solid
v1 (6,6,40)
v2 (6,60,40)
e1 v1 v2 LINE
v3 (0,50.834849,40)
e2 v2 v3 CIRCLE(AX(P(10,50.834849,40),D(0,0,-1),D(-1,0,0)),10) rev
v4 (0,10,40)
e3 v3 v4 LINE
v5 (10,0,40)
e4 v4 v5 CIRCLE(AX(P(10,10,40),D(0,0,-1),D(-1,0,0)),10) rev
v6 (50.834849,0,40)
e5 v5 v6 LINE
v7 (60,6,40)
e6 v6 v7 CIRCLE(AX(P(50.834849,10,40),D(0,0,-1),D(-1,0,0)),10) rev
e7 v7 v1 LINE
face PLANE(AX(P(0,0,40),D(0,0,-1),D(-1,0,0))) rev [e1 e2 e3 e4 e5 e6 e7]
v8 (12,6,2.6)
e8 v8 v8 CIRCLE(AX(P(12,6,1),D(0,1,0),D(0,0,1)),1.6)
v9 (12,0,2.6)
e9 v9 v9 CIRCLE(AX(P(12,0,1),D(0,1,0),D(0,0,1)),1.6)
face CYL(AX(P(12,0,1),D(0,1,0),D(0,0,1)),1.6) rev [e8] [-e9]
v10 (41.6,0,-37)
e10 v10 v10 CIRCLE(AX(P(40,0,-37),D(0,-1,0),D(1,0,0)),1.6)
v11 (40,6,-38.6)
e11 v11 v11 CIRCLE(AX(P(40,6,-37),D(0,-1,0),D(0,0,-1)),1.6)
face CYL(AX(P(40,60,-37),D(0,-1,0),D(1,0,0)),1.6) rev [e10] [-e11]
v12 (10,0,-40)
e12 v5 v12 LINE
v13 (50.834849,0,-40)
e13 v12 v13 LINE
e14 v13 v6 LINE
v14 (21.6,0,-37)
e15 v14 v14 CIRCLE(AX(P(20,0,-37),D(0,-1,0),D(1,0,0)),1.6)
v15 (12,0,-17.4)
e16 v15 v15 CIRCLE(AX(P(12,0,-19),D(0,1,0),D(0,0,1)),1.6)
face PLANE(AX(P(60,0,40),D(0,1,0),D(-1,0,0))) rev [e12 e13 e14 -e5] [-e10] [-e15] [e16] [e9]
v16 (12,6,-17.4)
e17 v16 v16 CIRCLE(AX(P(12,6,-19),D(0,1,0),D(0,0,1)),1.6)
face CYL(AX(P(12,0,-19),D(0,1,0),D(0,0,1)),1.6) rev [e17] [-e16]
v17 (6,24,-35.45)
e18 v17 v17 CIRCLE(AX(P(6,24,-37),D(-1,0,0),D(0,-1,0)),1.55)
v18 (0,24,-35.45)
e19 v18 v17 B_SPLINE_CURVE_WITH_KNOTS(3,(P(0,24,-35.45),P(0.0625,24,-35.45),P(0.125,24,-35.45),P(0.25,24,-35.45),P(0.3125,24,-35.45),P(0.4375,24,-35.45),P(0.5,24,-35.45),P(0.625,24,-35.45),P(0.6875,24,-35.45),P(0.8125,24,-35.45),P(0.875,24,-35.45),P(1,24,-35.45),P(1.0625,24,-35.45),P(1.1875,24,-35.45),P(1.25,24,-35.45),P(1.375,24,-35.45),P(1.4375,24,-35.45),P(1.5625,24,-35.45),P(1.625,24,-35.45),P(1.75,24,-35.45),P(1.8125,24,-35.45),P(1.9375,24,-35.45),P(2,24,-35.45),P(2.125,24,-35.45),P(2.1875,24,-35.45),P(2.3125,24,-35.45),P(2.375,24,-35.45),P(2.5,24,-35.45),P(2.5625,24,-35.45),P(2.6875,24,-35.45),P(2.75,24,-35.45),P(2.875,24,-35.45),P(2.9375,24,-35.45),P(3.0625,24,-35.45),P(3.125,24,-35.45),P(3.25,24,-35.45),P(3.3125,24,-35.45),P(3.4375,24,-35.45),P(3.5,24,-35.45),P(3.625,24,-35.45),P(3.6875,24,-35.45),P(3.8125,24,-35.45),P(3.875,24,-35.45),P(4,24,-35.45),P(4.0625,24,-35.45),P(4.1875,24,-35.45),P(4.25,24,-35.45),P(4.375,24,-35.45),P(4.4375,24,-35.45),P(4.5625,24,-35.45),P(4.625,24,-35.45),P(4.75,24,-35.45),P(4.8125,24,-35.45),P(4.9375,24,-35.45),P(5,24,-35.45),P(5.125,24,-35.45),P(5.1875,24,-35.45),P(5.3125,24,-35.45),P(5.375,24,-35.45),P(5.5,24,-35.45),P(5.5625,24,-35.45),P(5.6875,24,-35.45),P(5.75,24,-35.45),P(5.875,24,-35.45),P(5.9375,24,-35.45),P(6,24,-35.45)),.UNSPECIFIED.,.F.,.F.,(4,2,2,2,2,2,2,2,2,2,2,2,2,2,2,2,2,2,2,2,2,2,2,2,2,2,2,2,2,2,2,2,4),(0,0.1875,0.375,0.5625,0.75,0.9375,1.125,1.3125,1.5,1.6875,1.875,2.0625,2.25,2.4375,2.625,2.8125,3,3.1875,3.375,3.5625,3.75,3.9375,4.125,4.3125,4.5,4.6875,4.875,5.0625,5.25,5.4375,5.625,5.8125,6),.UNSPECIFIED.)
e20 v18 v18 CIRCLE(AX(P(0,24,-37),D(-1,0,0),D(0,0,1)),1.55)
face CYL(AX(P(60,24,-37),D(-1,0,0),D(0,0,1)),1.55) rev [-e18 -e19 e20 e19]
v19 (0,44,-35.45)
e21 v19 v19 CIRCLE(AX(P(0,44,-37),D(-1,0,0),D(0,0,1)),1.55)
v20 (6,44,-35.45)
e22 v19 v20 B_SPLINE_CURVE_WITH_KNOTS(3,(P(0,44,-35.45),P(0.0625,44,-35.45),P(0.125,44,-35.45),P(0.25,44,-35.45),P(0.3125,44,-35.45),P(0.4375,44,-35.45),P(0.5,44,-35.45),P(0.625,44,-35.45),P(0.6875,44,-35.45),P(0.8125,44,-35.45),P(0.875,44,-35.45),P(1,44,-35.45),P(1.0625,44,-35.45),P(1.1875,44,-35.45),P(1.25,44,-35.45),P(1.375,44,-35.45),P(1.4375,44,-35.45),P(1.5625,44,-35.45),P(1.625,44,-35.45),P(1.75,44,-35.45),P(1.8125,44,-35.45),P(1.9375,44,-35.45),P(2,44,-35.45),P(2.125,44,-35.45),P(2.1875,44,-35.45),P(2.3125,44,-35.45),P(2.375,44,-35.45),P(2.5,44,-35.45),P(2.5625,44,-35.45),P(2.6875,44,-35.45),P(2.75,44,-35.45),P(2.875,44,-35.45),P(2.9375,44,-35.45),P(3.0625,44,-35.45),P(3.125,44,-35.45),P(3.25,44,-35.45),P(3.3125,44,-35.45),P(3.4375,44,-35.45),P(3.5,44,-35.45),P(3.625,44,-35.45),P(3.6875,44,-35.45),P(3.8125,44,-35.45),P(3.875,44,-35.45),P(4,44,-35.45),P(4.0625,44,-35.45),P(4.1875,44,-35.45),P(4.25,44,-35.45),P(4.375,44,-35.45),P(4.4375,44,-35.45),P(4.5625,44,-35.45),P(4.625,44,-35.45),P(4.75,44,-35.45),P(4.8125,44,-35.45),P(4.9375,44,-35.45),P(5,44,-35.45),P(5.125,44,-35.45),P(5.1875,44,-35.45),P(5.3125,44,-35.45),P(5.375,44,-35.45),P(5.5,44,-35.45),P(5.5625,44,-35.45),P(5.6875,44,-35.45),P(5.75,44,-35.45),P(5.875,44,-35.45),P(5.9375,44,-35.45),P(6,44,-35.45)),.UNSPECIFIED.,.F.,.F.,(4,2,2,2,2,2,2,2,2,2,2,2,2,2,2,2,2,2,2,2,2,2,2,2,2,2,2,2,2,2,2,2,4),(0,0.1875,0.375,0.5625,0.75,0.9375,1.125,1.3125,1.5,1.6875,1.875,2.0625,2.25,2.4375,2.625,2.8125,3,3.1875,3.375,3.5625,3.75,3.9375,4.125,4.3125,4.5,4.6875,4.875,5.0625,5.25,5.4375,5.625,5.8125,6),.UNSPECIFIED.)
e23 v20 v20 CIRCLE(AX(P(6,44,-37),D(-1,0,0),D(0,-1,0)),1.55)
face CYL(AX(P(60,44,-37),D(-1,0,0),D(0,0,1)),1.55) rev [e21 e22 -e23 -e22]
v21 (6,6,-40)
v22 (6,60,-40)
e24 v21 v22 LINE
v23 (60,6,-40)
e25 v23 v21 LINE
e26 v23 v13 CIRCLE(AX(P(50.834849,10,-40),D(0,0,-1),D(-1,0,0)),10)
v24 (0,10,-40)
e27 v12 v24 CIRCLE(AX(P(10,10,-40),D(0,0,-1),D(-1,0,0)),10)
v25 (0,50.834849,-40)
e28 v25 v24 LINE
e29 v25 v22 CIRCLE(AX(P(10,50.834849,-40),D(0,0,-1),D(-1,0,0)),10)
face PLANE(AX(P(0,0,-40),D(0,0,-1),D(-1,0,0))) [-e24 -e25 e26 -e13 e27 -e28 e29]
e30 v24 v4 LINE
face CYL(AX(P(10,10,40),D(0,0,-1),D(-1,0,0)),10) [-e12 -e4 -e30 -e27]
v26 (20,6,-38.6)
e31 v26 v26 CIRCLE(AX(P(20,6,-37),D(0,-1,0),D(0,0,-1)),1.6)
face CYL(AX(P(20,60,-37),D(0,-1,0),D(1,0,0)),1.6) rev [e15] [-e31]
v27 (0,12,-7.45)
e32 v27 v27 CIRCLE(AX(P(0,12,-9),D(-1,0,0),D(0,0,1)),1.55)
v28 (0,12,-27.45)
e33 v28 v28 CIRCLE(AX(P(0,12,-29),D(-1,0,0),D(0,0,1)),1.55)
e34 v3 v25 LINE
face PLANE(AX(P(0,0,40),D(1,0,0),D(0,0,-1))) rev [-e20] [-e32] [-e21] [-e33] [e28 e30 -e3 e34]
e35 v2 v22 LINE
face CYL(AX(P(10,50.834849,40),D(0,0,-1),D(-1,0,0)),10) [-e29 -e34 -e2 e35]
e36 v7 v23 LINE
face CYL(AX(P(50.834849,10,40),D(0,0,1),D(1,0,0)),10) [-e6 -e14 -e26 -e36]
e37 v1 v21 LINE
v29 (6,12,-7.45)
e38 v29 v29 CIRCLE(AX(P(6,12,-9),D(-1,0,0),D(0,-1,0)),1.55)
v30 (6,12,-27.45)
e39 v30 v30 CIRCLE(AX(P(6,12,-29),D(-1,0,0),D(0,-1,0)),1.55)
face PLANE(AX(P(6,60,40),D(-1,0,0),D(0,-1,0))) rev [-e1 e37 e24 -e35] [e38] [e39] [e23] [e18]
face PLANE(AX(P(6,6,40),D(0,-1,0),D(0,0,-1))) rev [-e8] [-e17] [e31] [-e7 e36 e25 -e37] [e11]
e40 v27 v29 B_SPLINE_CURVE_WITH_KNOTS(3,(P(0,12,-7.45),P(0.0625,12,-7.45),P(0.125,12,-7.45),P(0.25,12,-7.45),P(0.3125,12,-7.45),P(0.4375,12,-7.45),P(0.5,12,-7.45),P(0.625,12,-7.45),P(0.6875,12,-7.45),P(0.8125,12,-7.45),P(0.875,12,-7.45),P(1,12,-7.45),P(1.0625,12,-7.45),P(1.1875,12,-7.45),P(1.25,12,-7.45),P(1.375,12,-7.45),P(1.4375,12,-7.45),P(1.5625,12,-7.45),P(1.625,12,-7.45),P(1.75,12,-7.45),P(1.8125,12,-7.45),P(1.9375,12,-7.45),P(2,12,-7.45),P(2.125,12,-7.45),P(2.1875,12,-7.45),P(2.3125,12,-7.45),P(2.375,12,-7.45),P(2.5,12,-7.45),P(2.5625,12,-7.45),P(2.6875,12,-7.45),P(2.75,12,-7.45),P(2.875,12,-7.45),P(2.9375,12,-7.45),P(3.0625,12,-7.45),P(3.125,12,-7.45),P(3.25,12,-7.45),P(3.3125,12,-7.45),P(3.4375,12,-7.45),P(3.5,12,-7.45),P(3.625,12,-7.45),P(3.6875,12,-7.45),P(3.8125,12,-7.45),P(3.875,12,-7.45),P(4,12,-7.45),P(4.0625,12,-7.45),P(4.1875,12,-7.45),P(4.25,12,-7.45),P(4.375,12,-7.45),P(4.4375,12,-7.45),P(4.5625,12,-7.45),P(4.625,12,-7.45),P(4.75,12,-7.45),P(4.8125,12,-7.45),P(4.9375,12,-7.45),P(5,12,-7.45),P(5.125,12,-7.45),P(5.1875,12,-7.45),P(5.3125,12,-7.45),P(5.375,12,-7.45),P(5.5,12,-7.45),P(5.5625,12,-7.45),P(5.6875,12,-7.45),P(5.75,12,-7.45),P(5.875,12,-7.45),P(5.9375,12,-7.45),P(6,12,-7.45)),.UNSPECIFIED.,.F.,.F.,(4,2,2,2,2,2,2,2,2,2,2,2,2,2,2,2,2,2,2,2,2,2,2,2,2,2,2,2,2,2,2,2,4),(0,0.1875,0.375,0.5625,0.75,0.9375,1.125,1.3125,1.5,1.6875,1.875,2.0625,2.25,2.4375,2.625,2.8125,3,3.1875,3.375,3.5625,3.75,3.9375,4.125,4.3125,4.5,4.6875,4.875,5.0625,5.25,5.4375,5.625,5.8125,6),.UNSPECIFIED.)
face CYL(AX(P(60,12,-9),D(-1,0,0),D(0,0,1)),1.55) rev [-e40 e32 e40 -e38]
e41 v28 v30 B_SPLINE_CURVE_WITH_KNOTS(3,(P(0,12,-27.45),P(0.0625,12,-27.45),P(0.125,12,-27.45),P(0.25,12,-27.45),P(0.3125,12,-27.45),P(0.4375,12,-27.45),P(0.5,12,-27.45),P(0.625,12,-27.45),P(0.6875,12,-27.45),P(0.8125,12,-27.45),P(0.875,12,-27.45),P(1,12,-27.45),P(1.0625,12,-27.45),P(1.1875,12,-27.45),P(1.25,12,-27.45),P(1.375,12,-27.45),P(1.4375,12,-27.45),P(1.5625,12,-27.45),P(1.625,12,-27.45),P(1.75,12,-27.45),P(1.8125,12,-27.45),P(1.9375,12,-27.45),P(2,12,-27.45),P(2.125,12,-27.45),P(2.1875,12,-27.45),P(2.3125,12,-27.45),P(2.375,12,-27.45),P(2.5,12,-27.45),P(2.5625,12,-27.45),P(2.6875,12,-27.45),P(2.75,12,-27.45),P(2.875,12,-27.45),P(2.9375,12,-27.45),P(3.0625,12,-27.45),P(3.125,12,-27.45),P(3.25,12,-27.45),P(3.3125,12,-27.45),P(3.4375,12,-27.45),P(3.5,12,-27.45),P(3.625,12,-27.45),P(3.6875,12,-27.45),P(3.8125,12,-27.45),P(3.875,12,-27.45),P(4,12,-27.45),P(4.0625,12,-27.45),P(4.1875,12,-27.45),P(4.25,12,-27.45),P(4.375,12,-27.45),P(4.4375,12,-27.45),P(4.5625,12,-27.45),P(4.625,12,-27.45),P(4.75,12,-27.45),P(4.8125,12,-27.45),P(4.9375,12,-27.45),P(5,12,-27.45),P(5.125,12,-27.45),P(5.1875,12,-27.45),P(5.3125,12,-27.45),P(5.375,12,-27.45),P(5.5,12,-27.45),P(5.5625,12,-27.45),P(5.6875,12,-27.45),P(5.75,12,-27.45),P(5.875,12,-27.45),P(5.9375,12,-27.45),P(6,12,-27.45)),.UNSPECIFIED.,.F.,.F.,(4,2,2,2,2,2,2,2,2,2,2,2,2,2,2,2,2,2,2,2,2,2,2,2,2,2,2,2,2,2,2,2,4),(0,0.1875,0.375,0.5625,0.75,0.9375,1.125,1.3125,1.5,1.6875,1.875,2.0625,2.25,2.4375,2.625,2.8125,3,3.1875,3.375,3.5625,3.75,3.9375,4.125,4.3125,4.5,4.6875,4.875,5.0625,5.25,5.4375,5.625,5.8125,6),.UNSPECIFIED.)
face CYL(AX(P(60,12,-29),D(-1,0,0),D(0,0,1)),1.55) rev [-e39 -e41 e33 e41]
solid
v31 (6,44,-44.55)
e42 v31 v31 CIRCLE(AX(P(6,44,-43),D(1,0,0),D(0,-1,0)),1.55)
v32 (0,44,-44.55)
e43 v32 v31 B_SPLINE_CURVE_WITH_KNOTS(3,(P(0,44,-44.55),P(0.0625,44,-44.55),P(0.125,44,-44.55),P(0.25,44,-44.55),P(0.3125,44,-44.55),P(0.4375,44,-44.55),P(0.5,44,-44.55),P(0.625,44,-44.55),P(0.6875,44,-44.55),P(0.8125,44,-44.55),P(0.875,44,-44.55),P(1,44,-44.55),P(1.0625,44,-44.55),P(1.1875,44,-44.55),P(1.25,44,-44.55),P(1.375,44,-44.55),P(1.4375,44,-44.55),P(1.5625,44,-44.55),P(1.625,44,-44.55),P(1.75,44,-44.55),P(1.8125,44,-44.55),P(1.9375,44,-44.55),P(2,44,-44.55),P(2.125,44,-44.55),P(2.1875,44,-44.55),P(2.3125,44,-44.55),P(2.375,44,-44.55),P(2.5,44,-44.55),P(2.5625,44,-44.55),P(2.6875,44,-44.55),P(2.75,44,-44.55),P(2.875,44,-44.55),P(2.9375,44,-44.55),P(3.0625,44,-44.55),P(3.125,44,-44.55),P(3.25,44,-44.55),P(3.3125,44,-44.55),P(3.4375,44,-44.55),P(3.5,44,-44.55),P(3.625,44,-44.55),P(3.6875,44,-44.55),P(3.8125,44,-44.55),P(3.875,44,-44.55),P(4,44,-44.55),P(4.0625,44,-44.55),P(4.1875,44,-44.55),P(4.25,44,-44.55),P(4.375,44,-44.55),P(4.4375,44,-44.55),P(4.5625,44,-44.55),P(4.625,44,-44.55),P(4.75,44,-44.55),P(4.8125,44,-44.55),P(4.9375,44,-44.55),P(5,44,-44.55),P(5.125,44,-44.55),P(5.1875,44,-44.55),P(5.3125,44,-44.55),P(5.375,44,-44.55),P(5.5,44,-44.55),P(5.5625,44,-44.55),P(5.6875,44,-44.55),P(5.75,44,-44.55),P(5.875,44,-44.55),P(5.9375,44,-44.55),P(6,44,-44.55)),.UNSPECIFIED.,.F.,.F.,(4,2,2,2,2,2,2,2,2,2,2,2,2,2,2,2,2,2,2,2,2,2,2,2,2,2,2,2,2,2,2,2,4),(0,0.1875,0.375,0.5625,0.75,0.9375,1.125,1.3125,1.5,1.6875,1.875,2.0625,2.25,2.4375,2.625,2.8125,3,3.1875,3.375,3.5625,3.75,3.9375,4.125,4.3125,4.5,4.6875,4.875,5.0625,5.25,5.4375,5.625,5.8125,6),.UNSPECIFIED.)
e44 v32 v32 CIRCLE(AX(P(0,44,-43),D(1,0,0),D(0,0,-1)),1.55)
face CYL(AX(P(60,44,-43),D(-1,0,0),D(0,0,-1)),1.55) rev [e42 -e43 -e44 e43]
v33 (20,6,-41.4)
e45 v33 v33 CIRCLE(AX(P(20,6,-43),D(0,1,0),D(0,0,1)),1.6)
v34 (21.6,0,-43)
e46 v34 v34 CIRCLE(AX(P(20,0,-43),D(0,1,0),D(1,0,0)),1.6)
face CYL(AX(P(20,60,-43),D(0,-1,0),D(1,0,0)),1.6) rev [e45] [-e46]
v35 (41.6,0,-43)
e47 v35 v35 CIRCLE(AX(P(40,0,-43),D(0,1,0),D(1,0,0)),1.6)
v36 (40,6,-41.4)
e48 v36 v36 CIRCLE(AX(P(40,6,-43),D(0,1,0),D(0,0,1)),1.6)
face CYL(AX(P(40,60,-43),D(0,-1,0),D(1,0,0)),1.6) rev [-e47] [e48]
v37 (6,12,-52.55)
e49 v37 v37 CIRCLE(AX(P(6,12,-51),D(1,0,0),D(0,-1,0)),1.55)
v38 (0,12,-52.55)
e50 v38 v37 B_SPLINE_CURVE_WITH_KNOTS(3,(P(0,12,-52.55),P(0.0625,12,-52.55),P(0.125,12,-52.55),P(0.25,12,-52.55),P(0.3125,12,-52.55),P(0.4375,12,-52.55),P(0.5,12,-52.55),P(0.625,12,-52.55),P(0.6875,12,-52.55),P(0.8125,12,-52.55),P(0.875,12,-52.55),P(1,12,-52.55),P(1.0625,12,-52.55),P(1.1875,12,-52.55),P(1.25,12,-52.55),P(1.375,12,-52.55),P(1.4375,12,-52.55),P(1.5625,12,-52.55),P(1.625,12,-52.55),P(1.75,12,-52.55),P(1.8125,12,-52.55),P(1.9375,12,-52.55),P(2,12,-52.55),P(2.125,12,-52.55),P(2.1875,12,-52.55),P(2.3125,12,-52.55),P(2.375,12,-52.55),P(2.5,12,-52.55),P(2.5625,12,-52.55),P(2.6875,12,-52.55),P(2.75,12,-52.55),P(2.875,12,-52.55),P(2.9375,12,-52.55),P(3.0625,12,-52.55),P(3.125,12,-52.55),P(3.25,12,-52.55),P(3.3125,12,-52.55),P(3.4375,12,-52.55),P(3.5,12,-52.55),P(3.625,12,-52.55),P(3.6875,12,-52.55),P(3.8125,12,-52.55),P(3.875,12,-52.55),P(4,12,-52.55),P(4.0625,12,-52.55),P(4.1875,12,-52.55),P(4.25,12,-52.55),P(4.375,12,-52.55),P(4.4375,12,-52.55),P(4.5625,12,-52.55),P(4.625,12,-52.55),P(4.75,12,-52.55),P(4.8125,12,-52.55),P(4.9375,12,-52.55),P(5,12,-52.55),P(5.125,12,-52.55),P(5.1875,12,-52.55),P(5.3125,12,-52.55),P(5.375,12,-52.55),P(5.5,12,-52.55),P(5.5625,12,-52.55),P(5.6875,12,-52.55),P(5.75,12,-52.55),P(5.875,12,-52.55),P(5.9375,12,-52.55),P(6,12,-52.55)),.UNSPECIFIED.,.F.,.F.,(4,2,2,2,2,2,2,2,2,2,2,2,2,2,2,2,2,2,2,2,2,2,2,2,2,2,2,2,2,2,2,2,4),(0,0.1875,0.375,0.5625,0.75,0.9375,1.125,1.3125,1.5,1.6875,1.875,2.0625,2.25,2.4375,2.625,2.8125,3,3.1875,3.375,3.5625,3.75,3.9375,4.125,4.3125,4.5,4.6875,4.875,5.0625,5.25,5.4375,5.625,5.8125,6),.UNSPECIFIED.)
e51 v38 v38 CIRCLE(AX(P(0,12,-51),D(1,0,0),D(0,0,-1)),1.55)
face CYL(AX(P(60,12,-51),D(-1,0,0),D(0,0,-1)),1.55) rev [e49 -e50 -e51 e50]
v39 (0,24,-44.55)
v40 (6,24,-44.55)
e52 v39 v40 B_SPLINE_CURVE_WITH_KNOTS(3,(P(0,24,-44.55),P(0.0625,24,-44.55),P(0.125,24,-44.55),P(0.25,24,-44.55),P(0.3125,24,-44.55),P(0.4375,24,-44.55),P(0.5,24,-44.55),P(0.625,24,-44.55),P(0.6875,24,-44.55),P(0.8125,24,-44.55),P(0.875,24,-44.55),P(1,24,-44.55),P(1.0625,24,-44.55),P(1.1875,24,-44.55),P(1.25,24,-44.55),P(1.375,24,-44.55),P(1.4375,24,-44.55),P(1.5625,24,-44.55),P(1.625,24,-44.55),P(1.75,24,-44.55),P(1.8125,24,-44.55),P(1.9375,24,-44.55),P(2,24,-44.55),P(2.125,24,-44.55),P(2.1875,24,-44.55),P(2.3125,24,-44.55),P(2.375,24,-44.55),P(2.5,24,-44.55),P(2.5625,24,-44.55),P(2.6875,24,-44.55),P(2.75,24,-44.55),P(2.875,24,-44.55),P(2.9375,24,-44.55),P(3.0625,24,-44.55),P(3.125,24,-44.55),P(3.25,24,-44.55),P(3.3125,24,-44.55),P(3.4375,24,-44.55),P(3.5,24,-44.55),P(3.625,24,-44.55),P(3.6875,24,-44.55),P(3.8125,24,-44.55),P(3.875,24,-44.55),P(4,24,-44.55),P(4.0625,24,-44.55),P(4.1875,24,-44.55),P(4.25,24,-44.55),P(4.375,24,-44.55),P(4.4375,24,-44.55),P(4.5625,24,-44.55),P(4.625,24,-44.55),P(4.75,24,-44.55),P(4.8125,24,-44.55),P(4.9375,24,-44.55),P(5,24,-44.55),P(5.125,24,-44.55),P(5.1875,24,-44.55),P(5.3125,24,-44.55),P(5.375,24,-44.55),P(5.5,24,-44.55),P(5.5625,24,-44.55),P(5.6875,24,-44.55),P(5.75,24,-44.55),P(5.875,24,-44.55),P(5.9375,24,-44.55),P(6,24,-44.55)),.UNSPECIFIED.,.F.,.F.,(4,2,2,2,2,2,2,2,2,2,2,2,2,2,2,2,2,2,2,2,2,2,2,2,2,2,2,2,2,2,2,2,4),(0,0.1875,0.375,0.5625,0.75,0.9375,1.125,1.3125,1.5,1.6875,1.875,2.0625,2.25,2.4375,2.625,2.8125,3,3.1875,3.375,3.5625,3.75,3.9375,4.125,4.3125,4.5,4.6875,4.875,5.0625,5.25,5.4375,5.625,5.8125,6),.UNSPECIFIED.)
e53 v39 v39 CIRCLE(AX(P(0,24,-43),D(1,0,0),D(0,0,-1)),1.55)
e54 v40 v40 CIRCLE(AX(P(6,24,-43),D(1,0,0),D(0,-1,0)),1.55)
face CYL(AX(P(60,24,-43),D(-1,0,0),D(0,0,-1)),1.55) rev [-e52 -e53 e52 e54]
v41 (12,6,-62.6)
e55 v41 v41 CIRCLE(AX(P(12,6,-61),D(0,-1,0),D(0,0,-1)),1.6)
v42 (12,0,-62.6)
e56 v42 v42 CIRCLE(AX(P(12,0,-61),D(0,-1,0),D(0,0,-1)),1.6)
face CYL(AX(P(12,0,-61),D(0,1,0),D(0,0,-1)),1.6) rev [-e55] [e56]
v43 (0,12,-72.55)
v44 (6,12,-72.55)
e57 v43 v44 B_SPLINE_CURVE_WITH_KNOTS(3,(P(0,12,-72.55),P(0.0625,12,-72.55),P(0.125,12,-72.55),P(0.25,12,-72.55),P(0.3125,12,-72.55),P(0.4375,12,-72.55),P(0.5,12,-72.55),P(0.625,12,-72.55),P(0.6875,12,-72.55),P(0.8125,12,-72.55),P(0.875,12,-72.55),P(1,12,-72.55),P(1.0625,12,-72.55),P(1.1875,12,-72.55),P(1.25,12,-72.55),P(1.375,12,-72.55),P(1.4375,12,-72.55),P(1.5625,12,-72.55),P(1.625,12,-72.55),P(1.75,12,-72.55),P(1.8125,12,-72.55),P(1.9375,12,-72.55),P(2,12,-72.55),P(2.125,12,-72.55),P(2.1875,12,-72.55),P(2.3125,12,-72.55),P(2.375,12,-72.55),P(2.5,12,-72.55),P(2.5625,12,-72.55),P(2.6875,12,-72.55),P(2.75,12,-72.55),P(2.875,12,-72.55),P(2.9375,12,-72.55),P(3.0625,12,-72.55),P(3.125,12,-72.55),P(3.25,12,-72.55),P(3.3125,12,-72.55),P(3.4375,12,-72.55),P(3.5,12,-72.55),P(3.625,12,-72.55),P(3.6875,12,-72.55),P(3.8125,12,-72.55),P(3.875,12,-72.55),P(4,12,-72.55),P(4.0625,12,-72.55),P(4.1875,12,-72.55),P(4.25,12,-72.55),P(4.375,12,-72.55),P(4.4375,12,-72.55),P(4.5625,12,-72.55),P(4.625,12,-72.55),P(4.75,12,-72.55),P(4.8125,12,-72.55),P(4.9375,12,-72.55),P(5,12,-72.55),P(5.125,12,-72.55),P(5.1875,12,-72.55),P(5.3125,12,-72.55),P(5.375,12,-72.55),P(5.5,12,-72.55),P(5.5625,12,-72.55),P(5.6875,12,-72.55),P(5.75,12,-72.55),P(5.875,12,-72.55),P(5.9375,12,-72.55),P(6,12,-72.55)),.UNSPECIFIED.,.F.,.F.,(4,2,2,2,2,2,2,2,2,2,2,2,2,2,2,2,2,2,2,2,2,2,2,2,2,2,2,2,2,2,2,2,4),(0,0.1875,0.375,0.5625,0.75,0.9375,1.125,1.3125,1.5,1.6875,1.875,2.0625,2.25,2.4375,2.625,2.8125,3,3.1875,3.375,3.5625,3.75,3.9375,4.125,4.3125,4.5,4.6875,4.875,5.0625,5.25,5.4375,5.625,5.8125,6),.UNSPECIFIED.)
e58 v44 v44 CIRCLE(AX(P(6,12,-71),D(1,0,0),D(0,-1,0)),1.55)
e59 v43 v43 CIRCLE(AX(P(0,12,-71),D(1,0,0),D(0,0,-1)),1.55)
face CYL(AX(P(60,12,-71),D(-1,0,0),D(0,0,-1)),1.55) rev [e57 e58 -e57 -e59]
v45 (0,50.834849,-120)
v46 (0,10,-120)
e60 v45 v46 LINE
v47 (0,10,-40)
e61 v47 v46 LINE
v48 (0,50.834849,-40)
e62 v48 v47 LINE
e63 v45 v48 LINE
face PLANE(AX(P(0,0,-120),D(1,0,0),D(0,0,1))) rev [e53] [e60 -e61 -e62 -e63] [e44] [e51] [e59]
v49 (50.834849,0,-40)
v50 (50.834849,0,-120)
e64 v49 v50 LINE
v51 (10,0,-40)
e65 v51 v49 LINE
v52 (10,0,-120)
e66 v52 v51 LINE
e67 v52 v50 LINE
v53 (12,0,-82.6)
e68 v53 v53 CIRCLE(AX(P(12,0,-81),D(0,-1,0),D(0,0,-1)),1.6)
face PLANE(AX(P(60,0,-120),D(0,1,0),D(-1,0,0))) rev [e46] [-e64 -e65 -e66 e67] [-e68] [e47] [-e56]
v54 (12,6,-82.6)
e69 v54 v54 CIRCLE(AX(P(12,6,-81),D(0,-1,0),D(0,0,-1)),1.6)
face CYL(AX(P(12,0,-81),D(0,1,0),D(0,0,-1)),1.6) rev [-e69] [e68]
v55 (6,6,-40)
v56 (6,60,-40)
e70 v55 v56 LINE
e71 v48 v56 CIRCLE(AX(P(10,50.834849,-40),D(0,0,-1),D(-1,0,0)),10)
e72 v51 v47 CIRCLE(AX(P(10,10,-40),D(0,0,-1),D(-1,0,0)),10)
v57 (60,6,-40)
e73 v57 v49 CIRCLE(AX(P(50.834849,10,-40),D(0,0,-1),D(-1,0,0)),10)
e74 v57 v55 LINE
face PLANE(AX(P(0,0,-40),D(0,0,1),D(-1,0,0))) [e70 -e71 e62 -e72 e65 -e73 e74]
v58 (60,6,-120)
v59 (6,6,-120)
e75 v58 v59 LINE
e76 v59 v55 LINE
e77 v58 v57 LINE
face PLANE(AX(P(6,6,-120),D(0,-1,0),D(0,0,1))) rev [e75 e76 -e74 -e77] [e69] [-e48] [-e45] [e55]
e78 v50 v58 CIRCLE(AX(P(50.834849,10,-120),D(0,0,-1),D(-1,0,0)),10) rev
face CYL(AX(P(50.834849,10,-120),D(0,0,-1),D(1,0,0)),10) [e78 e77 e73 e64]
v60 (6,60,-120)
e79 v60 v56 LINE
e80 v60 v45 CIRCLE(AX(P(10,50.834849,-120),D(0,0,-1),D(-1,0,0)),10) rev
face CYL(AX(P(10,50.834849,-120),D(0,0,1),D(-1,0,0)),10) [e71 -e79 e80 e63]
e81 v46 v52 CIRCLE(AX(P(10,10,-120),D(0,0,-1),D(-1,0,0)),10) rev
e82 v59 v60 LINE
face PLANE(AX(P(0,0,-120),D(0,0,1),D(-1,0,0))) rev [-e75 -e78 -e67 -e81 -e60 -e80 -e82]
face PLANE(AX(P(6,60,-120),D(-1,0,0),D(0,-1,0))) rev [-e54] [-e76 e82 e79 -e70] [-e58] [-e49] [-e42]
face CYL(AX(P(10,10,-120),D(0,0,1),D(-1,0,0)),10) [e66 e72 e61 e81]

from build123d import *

# Parameters (mm, degrees)
EXTRUDE_1_DEPTH     = 40
FILLET_1_R          = 10
SKETCH_3_R          = 1.55
CUT_EXTRUDE_1_DEPTH = 94.808315196
SKETCH_4_R          = 1.6
CUT_EXTRUDE_2_DEPTH = 91.088845036
SKETCH_5_R          = 1.6
CUT_EXTRUDE_3_DEPTH = 94.808315196


with BuildPart() as part:
    # 草图1 → 凸台-拉伸1 (new, symmetric)
    with BuildSketch(Plane.XY):
        Polygon((0, 0), (0, 60), (6, 60), (6, 6), (60, 6), (60, 0), align=None)
    extrude(amount=EXTRUDE_1_DEPTH, both=True)

    # 圆角1
    # the kernel refuses this fillet: 10 mm, written as the material it takes off along each edge
    with BuildSketch(Plane(origin=(0, 60, 62.912878475), x_dir=(0, -1, 0), z_dir=(0, 0, -1))) as fillet_1_piece_1:
        with BuildLine():
            CenterArc((9.16515139, -10), FILLET_1_R, 90, 66.421821522)
            Line((0, -6), (-0.183303028, -5.92))
            ThreePointArc((-0.183303028, -5.92), (-0.2, -3), (-0.2, 0))
            Line((-0.2, 0), (0, 0.2))
            Line((0, 0.2), (9.16515139, 0.2))
            Line((9.16515139, 0.2), (9.16515139, 0))
        make_face()
    extrude(amount=125.82575695, mode=Mode.SUBTRACT)
    with BuildSketch(Plane(origin=(60, 0, -62.912878475), x_dir=(0, 1, 0), z_dir=(0, 0, 1))) as fillet_1_piece_2:
        with BuildLine():
            CenterArc((10, 9.16515139), FILLET_1_R, 180, 66.421821522)
            Line((0, 9.16515139), (-0.2, 9.16515139))
            Line((-0.2, 9.16515139), (-0.2, 0))
            Line((-0.2, 0), (0, -0.2))
            ThreePointArc((0, -0.2), (3, -0.2), (5.92, -0.183303028))
            Line((5.92, -0.183303028), (6, 0))
        make_face()
    extrude(amount=125.82575695, mode=Mode.SUBTRACT)
    with BuildSketch(Plane(origin=(0, 0, -65), x_dir=(0, 1, 0), z_dir=(0, 0, 1))) as fillet_1_piece_3:
        with BuildLine():
            CenterArc((FILLET_1_R, -FILLET_1_R), FILLET_1_R, 90, 90)
            Line((0, -FILLET_1_R), (-FILLET_1_R * 0.02, -FILLET_1_R))
            Line((-FILLET_1_R * 0.02, -FILLET_1_R), (-FILLET_1_R * 0.02, FILLET_1_R * 0.02))
            Line((-FILLET_1_R * 0.02, FILLET_1_R * 0.02), (FILLET_1_R, FILLET_1_R * 0.02))
            Line((FILLET_1_R, FILLET_1_R * 0.02), (FILLET_1_R, 0))
        make_face()
    extrude(amount=130, mode=Mode.SUBTRACT)

    # 草图3 → 切除-拉伸1 (cut, through all)
    with BuildSketch(Plane.ZY):
        with Locations((-37, 44)):
            Circle(SKETCH_3_R)
        with Locations((-37, 24)):
            Circle(SKETCH_3_R)
        with Locations((-29, 12)):
            Circle(SKETCH_3_R)
        with Locations((-9, 12)):
            Circle(SKETCH_3_R)
    extrude(amount=-CUT_EXTRUDE_1_DEPTH, mode=Mode.SUBTRACT)

    # 草图4 → 切除-拉伸2 (cut, through all)
    with BuildSketch(Plane(origin=(0, 6, 0), x_dir=(1, 0, 0), z_dir=(0, 1, 0))):
        with Locations(Location((12, -1, 0), (0, 0, 270))):
            Circle(SKETCH_4_R)
        with Locations(Location((12, 19, 0), (0, 0, 270))):
            Circle(SKETCH_4_R)
    extrude(amount=-CUT_EXTRUDE_2_DEPTH, mode=Mode.SUBTRACT)

    # 草图5 → 切除-拉伸3 (cut, through all)
    with BuildSketch(Plane.XZ):
        with Locations((20, -37)):
            Circle(SKETCH_5_R)
        with Locations((40, -37)):
            Circle(SKETCH_5_R)
    extrude(amount=-CUT_EXTRUDE_3_DEPTH, mode=Mode.SUBTRACT)


with BuildPart() as body_2:
    # 镜向1: mirrored copy
    add(part.part.mirror(Plane(origin=(0, 0, -40), x_dir=(1, 0, 0), z_dir=(0, 0, -1))))


solid = Compound([part.part, body_2.part])
